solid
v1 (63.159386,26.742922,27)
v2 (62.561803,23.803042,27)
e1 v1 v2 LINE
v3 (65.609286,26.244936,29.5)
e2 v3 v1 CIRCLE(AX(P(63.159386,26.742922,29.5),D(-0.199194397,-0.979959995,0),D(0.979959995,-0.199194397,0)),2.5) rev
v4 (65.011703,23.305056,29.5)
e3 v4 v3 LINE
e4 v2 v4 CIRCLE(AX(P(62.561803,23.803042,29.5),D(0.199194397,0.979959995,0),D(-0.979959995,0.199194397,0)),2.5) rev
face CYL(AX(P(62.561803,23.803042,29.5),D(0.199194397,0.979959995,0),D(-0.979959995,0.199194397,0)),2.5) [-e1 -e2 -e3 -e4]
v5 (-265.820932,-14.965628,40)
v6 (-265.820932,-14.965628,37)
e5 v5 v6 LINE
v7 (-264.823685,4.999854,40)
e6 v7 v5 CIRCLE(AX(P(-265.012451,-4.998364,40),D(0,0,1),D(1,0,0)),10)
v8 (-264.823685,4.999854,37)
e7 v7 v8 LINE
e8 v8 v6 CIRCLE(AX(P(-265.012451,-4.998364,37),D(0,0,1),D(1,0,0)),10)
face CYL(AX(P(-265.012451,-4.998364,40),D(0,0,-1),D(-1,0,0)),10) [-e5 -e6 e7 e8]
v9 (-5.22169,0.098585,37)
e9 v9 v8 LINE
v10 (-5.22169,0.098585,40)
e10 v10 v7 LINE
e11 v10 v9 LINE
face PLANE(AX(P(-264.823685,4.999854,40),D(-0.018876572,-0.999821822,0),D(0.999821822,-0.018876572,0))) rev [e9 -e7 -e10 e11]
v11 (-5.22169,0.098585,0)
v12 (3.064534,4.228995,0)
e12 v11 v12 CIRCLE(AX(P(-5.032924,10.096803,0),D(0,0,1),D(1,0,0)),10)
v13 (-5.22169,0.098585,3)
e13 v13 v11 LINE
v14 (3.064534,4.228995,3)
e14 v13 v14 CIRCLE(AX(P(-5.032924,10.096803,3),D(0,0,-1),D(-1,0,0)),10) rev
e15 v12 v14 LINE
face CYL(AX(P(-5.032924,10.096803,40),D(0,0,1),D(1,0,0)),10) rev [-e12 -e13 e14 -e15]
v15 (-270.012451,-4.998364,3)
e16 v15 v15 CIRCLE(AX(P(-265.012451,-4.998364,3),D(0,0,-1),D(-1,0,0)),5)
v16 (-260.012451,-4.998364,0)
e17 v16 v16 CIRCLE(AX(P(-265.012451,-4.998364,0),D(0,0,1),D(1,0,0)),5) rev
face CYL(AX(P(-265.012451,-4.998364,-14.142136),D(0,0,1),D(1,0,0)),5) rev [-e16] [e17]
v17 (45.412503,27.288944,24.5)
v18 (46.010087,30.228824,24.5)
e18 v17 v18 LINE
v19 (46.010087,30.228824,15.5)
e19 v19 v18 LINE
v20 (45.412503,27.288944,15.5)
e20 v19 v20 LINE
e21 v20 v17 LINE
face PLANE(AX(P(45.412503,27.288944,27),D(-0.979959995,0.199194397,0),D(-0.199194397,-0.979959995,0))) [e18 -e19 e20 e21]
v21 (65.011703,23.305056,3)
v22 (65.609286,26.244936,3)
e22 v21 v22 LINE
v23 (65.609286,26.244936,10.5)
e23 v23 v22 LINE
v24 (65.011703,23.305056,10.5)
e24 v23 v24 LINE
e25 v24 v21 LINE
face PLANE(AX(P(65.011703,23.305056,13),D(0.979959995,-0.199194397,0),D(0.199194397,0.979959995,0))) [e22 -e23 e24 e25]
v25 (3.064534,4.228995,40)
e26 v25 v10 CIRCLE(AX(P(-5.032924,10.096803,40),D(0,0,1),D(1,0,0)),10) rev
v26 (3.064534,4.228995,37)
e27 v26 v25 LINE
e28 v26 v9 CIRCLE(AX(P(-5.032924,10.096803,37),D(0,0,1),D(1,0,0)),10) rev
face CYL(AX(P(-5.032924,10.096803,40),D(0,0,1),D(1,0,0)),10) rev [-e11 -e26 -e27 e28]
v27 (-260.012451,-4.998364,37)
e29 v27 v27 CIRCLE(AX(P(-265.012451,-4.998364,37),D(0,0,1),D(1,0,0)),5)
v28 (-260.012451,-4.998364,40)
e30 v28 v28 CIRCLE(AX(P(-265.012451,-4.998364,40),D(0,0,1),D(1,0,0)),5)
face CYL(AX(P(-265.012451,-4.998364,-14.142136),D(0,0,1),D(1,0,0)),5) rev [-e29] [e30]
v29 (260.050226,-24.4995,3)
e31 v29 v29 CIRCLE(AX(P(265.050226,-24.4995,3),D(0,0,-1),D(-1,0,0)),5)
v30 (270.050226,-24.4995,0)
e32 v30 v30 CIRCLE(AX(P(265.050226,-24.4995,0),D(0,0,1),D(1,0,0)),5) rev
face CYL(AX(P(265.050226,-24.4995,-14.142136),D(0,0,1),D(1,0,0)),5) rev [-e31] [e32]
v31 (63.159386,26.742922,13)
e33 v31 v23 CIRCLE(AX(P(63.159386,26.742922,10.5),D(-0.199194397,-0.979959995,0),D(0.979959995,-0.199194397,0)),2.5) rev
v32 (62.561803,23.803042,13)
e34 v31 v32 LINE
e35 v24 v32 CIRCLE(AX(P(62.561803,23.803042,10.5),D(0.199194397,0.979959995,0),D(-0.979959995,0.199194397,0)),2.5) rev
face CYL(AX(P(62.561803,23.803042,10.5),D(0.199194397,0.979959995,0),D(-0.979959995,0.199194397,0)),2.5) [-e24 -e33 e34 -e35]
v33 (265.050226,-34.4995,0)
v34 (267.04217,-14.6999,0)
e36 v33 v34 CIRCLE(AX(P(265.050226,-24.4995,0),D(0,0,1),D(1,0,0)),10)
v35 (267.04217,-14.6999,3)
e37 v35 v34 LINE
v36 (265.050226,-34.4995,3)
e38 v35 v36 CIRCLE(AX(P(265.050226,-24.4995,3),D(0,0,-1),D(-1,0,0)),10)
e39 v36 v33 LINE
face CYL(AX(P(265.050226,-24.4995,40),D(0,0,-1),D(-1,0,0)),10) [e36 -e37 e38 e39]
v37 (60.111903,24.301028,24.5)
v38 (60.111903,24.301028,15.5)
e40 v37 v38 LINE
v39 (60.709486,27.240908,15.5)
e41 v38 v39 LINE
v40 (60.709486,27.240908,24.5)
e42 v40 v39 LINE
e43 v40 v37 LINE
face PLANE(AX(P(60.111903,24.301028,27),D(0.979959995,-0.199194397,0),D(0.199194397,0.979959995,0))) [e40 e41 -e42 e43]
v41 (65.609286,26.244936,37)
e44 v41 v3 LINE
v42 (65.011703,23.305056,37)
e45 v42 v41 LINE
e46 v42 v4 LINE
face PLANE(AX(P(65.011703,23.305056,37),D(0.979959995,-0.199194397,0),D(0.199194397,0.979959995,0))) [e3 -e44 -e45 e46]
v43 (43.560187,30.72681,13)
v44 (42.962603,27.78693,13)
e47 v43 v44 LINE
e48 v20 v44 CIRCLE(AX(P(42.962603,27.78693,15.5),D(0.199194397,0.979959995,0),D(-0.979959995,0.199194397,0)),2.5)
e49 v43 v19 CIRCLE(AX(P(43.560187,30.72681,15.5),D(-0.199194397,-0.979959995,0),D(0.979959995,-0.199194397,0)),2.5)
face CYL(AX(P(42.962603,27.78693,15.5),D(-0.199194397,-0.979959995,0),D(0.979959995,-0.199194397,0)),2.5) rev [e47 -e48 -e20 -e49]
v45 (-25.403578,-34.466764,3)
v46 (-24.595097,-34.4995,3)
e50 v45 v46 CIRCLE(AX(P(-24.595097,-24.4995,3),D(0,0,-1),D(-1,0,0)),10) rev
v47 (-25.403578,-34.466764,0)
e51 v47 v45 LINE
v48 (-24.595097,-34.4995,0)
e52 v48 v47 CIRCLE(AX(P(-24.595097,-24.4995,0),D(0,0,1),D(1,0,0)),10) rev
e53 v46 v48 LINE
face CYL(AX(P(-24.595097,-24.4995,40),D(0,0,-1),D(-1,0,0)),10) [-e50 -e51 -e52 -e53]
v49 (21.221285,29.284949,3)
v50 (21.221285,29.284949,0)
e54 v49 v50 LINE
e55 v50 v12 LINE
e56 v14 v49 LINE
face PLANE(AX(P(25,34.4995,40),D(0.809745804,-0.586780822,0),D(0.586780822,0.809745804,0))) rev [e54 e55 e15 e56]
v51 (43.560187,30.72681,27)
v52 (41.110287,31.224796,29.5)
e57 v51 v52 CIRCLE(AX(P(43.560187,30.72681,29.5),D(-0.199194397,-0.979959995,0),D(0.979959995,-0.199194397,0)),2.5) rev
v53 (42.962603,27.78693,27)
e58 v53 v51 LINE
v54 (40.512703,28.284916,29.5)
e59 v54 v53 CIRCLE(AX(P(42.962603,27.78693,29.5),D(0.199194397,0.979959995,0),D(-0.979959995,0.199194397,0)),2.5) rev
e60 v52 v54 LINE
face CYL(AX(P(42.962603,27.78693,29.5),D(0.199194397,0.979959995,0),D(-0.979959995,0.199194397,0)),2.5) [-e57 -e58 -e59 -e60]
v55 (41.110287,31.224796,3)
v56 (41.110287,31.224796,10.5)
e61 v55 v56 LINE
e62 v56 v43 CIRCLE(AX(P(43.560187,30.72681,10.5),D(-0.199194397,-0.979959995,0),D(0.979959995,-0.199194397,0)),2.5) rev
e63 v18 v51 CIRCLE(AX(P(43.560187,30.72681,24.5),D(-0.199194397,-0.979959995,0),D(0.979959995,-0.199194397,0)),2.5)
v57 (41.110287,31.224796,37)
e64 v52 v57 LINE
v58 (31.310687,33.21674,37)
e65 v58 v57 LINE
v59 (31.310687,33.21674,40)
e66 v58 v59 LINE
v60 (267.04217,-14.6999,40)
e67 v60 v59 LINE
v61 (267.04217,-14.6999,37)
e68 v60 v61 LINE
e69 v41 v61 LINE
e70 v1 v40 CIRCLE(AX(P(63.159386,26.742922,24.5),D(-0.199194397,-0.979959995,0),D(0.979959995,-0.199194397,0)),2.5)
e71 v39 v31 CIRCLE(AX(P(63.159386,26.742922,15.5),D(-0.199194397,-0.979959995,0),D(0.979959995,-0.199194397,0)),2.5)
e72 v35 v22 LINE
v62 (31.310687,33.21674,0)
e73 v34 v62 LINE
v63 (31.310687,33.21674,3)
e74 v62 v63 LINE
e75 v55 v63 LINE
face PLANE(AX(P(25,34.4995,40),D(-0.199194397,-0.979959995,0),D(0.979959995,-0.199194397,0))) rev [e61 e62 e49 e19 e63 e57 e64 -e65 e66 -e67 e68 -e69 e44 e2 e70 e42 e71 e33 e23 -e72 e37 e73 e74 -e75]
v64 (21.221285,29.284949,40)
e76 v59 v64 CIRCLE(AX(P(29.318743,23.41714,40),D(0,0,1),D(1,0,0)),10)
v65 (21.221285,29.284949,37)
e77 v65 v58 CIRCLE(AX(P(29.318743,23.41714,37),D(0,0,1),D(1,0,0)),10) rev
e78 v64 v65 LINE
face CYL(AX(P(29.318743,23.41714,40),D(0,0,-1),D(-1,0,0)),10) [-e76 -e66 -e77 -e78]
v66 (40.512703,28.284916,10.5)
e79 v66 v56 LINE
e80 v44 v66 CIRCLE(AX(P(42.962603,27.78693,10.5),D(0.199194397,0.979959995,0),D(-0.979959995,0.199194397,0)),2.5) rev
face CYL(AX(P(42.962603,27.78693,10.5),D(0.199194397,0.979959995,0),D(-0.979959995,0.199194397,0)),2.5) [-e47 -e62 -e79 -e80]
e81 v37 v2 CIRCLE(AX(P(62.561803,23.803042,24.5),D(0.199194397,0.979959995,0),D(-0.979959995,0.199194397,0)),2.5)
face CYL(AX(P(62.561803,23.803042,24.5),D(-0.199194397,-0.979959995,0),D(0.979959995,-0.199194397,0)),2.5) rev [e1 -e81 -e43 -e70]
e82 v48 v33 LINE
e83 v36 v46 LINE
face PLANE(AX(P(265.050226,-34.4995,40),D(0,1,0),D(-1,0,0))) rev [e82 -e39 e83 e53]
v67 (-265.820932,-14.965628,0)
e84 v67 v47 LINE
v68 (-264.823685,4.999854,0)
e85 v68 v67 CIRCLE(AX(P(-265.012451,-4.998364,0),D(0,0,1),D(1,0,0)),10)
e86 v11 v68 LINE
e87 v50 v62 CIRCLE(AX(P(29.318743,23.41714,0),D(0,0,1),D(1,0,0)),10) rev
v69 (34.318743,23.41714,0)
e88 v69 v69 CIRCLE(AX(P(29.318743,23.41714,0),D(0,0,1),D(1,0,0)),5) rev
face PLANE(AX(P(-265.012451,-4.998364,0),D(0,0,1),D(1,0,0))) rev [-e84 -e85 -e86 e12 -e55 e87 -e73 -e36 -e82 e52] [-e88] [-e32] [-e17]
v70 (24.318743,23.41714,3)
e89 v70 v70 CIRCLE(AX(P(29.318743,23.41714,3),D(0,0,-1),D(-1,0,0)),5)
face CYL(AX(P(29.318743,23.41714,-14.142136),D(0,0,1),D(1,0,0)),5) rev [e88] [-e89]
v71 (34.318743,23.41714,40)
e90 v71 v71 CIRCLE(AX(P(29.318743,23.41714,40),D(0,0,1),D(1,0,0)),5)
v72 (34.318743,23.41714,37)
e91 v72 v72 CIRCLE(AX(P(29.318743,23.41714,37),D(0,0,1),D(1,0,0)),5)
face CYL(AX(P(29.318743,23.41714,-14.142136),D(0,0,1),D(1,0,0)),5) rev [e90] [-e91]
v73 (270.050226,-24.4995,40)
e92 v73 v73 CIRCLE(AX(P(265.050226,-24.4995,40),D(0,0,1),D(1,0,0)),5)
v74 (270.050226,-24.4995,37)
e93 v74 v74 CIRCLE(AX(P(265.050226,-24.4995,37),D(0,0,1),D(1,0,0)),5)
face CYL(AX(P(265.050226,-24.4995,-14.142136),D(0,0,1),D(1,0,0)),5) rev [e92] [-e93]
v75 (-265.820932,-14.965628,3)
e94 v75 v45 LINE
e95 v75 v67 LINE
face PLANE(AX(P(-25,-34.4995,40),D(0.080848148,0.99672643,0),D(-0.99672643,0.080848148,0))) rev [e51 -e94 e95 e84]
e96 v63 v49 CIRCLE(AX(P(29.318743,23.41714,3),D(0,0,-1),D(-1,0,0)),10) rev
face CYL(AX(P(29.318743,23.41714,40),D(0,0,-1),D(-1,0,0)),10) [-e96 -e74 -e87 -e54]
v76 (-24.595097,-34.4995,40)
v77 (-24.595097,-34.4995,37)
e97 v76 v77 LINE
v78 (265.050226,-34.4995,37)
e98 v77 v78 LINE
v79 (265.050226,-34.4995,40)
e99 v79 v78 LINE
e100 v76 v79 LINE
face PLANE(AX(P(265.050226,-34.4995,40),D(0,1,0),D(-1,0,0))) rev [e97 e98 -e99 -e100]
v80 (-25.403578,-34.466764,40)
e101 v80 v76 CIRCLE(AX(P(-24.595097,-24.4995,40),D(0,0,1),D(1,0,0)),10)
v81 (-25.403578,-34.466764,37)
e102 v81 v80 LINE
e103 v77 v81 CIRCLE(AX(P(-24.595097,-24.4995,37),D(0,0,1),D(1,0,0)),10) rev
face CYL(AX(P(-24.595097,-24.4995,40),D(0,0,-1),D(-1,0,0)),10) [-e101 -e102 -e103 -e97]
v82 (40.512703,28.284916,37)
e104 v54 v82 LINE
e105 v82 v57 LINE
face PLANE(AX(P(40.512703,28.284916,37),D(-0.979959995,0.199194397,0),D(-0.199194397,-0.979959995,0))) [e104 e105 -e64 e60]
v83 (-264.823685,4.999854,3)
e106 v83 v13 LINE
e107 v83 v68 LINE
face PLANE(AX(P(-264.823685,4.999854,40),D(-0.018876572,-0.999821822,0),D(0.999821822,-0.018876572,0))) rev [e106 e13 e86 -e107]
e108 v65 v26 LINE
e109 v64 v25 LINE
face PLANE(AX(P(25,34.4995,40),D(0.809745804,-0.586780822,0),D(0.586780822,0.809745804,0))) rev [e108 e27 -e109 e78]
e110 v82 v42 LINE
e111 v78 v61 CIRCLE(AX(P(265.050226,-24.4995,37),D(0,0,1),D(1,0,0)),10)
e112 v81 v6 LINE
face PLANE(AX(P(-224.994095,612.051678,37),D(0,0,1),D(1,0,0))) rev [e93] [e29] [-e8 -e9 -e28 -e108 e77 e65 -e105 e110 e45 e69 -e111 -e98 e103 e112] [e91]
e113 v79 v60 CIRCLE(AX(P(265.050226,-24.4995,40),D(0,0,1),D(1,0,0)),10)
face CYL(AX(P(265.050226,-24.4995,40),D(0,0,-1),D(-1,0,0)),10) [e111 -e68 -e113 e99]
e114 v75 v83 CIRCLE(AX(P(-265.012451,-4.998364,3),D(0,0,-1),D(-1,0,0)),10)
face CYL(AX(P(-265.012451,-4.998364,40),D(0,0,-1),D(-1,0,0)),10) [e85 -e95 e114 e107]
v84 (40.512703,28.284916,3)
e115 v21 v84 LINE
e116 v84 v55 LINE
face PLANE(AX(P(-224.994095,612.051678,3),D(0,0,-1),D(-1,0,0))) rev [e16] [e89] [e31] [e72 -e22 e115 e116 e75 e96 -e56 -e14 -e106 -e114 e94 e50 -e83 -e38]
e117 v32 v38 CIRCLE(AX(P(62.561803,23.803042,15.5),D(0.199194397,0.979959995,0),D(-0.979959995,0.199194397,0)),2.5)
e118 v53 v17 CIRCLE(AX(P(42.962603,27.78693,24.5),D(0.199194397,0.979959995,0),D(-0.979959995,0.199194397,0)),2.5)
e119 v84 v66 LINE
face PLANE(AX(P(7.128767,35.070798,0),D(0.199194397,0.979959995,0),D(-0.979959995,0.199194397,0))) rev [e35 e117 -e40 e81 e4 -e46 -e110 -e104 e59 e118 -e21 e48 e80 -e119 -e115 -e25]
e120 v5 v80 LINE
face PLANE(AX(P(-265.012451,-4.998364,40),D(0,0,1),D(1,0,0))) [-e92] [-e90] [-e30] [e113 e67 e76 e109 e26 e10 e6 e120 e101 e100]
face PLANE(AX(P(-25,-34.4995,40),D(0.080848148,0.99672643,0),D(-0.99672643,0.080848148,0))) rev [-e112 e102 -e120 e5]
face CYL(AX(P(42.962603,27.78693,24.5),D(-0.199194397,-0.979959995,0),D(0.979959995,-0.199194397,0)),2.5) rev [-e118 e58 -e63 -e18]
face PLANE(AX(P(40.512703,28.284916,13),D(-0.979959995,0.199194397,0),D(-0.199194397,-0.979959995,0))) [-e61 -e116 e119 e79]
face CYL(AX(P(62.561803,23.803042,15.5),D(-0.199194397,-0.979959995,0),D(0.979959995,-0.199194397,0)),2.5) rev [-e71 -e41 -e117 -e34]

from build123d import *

# Parameters (mm, degrees)
PROFILE_EXTRUDE_DEPTH        = 40
LIGHTNING_BOLT_FILLET_R      = 10
SHELL_CUT_REACH              = 291.378
SHELL_SKETCH_W               = 549.904110801
SHELL_SKETCH_H               = 34
HOLES_START                  = -40
HOLES_SKETCH_R               = 5
HOLES_CUT_DEPTH              = 40
BOWTIE_SUPPORT_EXTRUDE_DEPTH = 3
BOWTIE_SUPPORT_FILLET_R      = 2.5


# Some blends are built 0.0001 mm under size
with BuildPart() as part:
    # Profile Sketch → Profile Extrude (new body)
    with BuildSketch(Plane.XY):
        with BuildLine():
            Line((-25, -34.499500189), (-265.820932486, -14.965628235))
            ThreePointArc((-265.820932486, -14.965628235), (-275, -4.499500189), (-264.823685281, 4.999854285))
            Line((-264.823685281, 4.999854285), (0, 0))
            Line((0, 0), (25, 34.499500189))
            Line((25, 34.499500189), (267.042170119, -14.699900238))
            ThreePointArc((267.042170119, -14.699900238), (275, -25.500499811), (265.050226145, -34.499500189))
            Line((265.050226145, -34.499500189), (-25, -34.499500189))
        make_face()
    extrude(amount=PROFILE_EXTRUDE_DEPTH)

    # Lightning Bolt Fillet
    # the kernel refuses this fillet: 10 mm, written as the material it adds along each edge
    with BuildSketch(Plane(origin=(0, 0, 0), x_dir=(-0.9998218216369521, 0.0188765722144361, 0), z_dir=(0, 0, 1))) as lightning_bolt_fillet_piece_1:
        with BuildLine():
            CenterArc((LIGHTNING_BOLT_FILLET_R * 0.522262066694, -LIGHTNING_BOLT_FILLET_R), LIGHTNING_BOLT_FILLET_R, 90, 55.152715338)
            Line((-LIGHTNING_BOLT_FILLET_R * 0.298415868343, -LIGHTNING_BOLT_FILLET_R * 0.428608954443), (0, 0))
            Line((0, 0), (LIGHTNING_BOLT_FILLET_R * 0.522262066694, 0))
        make_face()
    extrude(amount=40)
    # the kernel refuses this fillet: 10 mm, written as the material it takes off along each edge
    with BuildSketch(Plane(origin=(25, 34.499500189, -16.099347603), x_dir=(0.9799599951405409, -0.19919439732118757, 0), z_dir=(0, 0, 1))) as lightning_bolt_fillet_2_piece_1:
        with BuildLine():
            CenterArc((LIGHTNING_BOLT_FILLET_R * 0.643973904117, -LIGHTNING_BOLT_FILLET_R), LIGHTNING_BOLT_FILLET_R, 90, 65.560956721)
            Line((-LIGHTNING_BOLT_FILLET_R * 0.266428041961, -LIGHTNING_BOLT_FILLET_R * 0.586275095532), (0, 0))
            Line((0, 0), (LIGHTNING_BOLT_FILLET_R * 0.643973904117, 0))
        make_face()
    extrude(amount=72.198695206, mode=Mode.SUBTRACT)
    with BuildSketch(Plane(origin=(-25, -34.499500189, -1.012258703), x_dir=(1, 0, 0), z_dir=(0, 0, 1))) as lightning_bolt_fillet_2_piece_2:
        with BuildLine():
            CenterArc((LIGHTNING_BOLT_FILLET_R * 0.0404903481386, LIGHTNING_BOLT_FILLET_R), LIGHTNING_BOLT_FILLET_R, 265.36268102, 4.63731898)
            Line((-LIGHTNING_BOLT_FILLET_R * 0.040357800163, LIGHTNING_BOLT_FILLET_R * 0.0032735696711), (0, 0))
            Line((0, 0), (LIGHTNING_BOLT_FILLET_R * 0.0404903481386, 0))
        make_face()
    extrude(amount=42.024517407, mode=Mode.SUBTRACT)

    # Shell Cut: up to this plane
    shell_cut_end = Plane(origin=(25, 34.499500189, 40), z_dir=(-0.19919439732118804, -0.9799599951405409, 0))
    # Shell Sketch → Shell Cut (cut, up to the surface)
    with BuildSketch(Plane(origin=(-2.943500576, -36.288584016, 0), x_dir=(0.996726430328903, -0.080848148301631, 0), z_dir=(-0.080848148301631, -0.996726430328903, 0)), mode=Mode.PRIVATE) as shell_cut_sk1:
        with Locations((1.211249587, 20)):
            Rectangle(SHELL_SKETCH_W, SHELL_SKETCH_H)
    shell_cut_tool1 = split(extrude(shell_cut_sk1.sketch, amount=-SHELL_CUT_REACH, mode=Mode.PRIVATE), bisect_by=shell_cut_end, keep=Keep.BOTH, mode=Mode.PRIVATE)
    add(shell_cut_tool1.solids().sort_by_distance((-1.736216, -36.386511, 20))[0], mode=Mode.SUBTRACT)


with BuildPart() as shell_cut_piece_1:
    # of the separate pieces the step leaves, piece 1, a body of its own (shell_cut_pieces)
    add(part.part.solids().sort_by_distance((3.06453365, 4.228995169, 37))[0])


with BuildPart() as shell_cut_piece_2:
    # of the separate pieces the step leaves, piece 2, a body of its own (shell_cut_pieces)
    add(part.part.solids().sort_by_distance((-5.221690109, 0.098585176, 0))[0])


with BuildPart() as holes_cut_tool:
    # Holes Sketch → Holes Cut (new body)
    with BuildSketch(Plane.XY.offset(40).offset(HOLES_START)):
        with Locations((-265.012451003, -4.998363931)):
            Circle(HOLES_SKETCH_R)
        with Locations((29.318742666, 23.4171403)):
            Circle(HOLES_SKETCH_R)
        with Locations((265.050226145, -24.499500189)):
            Circle(HOLES_SKETCH_R)
    extrude(amount=HOLES_CUT_DEPTH)


with BuildPart() as shell_cut_piece_1_1:
    add(shell_cut_piece_1.part)

    # Holes Cut: cut by holes_cut_tool
    add(holes_cut_tool.part, mode=Mode.SUBTRACT)



with BuildPart() as shell_cut_piece_2_1:
    add(shell_cut_piece_2.part)

    # Holes Cut: cut by holes_cut_tool
    add(holes_cut_tool.part, mode=Mode.SUBTRACT)


with BuildPart() as shell_cut_piece_1_2:
    add(shell_cut_piece_1_1.part)

    add(shell_cut_piece_2_1.part)  # Bowtie Support Extrude merges Shell Cut piece 2
    # Bowtie Support Sketch → Bowtie Support Extrude (add)
    with BuildSketch(Plane(origin=(7.726350286, 38.010678463, 0), x_dir=(0.9799599951405408, -0.1991943973211881, 0), z_dir=(0.1991943973211881, 0.9799599951405409, 0))):
        Polygon((39.066631772, -27), (39.066631772, -13), (34.066631772, -13), (34.066631772, -3), (39.066631772, -3), (54.066631772, -3), (59.066631772, -3), (59.066631772, -13), (54.066631772, -13), (54.066631772, -27), (59.066631772, -27), (59.066631772, -37), (54.066631772, -37), (39.066631772, -37), (34.066631772, -37), (34.066631772, -27), align=None)
    extrude(amount=-BOWTIE_SUPPORT_EXTRUDE_DEPTH)

    # Bowtie Support Fillet
    bowtie_support_fillet_edges = [shell_cut_piece_1_2.edges().sort_by_distance(p)[0] for p in [
        (60.410694898, 25.77096834, 13),
        (60.410694898, 25.77096834, 27),
        (45.711294971, 28.758884299, 13),
        (45.711294971, 28.758884299, 27),
    ]]
    fillet(bowtie_support_fillet_edges, radius=BOWTIE_SUPPORT_FILLET_R)
    bowtie_support_fillet_2_edges = [shell_cut_piece_1_2.edges().sort_by_distance(p)[0] for p in [
        (65.310494873, 24.774996353, 13),
        (65.310494873, 24.774996353, 27),
        (40.811494995, 29.754856286, 13),
        (40.811494995, 29.754856286, 27),
    ]]
    fillet(bowtie_support_fillet_2_edges, radius=BOWTIE_SUPPORT_FILLET_R - 0.0001)  # a hair under: the kernel refuses the full size


solid = shell_cut_piece_1_2.part
